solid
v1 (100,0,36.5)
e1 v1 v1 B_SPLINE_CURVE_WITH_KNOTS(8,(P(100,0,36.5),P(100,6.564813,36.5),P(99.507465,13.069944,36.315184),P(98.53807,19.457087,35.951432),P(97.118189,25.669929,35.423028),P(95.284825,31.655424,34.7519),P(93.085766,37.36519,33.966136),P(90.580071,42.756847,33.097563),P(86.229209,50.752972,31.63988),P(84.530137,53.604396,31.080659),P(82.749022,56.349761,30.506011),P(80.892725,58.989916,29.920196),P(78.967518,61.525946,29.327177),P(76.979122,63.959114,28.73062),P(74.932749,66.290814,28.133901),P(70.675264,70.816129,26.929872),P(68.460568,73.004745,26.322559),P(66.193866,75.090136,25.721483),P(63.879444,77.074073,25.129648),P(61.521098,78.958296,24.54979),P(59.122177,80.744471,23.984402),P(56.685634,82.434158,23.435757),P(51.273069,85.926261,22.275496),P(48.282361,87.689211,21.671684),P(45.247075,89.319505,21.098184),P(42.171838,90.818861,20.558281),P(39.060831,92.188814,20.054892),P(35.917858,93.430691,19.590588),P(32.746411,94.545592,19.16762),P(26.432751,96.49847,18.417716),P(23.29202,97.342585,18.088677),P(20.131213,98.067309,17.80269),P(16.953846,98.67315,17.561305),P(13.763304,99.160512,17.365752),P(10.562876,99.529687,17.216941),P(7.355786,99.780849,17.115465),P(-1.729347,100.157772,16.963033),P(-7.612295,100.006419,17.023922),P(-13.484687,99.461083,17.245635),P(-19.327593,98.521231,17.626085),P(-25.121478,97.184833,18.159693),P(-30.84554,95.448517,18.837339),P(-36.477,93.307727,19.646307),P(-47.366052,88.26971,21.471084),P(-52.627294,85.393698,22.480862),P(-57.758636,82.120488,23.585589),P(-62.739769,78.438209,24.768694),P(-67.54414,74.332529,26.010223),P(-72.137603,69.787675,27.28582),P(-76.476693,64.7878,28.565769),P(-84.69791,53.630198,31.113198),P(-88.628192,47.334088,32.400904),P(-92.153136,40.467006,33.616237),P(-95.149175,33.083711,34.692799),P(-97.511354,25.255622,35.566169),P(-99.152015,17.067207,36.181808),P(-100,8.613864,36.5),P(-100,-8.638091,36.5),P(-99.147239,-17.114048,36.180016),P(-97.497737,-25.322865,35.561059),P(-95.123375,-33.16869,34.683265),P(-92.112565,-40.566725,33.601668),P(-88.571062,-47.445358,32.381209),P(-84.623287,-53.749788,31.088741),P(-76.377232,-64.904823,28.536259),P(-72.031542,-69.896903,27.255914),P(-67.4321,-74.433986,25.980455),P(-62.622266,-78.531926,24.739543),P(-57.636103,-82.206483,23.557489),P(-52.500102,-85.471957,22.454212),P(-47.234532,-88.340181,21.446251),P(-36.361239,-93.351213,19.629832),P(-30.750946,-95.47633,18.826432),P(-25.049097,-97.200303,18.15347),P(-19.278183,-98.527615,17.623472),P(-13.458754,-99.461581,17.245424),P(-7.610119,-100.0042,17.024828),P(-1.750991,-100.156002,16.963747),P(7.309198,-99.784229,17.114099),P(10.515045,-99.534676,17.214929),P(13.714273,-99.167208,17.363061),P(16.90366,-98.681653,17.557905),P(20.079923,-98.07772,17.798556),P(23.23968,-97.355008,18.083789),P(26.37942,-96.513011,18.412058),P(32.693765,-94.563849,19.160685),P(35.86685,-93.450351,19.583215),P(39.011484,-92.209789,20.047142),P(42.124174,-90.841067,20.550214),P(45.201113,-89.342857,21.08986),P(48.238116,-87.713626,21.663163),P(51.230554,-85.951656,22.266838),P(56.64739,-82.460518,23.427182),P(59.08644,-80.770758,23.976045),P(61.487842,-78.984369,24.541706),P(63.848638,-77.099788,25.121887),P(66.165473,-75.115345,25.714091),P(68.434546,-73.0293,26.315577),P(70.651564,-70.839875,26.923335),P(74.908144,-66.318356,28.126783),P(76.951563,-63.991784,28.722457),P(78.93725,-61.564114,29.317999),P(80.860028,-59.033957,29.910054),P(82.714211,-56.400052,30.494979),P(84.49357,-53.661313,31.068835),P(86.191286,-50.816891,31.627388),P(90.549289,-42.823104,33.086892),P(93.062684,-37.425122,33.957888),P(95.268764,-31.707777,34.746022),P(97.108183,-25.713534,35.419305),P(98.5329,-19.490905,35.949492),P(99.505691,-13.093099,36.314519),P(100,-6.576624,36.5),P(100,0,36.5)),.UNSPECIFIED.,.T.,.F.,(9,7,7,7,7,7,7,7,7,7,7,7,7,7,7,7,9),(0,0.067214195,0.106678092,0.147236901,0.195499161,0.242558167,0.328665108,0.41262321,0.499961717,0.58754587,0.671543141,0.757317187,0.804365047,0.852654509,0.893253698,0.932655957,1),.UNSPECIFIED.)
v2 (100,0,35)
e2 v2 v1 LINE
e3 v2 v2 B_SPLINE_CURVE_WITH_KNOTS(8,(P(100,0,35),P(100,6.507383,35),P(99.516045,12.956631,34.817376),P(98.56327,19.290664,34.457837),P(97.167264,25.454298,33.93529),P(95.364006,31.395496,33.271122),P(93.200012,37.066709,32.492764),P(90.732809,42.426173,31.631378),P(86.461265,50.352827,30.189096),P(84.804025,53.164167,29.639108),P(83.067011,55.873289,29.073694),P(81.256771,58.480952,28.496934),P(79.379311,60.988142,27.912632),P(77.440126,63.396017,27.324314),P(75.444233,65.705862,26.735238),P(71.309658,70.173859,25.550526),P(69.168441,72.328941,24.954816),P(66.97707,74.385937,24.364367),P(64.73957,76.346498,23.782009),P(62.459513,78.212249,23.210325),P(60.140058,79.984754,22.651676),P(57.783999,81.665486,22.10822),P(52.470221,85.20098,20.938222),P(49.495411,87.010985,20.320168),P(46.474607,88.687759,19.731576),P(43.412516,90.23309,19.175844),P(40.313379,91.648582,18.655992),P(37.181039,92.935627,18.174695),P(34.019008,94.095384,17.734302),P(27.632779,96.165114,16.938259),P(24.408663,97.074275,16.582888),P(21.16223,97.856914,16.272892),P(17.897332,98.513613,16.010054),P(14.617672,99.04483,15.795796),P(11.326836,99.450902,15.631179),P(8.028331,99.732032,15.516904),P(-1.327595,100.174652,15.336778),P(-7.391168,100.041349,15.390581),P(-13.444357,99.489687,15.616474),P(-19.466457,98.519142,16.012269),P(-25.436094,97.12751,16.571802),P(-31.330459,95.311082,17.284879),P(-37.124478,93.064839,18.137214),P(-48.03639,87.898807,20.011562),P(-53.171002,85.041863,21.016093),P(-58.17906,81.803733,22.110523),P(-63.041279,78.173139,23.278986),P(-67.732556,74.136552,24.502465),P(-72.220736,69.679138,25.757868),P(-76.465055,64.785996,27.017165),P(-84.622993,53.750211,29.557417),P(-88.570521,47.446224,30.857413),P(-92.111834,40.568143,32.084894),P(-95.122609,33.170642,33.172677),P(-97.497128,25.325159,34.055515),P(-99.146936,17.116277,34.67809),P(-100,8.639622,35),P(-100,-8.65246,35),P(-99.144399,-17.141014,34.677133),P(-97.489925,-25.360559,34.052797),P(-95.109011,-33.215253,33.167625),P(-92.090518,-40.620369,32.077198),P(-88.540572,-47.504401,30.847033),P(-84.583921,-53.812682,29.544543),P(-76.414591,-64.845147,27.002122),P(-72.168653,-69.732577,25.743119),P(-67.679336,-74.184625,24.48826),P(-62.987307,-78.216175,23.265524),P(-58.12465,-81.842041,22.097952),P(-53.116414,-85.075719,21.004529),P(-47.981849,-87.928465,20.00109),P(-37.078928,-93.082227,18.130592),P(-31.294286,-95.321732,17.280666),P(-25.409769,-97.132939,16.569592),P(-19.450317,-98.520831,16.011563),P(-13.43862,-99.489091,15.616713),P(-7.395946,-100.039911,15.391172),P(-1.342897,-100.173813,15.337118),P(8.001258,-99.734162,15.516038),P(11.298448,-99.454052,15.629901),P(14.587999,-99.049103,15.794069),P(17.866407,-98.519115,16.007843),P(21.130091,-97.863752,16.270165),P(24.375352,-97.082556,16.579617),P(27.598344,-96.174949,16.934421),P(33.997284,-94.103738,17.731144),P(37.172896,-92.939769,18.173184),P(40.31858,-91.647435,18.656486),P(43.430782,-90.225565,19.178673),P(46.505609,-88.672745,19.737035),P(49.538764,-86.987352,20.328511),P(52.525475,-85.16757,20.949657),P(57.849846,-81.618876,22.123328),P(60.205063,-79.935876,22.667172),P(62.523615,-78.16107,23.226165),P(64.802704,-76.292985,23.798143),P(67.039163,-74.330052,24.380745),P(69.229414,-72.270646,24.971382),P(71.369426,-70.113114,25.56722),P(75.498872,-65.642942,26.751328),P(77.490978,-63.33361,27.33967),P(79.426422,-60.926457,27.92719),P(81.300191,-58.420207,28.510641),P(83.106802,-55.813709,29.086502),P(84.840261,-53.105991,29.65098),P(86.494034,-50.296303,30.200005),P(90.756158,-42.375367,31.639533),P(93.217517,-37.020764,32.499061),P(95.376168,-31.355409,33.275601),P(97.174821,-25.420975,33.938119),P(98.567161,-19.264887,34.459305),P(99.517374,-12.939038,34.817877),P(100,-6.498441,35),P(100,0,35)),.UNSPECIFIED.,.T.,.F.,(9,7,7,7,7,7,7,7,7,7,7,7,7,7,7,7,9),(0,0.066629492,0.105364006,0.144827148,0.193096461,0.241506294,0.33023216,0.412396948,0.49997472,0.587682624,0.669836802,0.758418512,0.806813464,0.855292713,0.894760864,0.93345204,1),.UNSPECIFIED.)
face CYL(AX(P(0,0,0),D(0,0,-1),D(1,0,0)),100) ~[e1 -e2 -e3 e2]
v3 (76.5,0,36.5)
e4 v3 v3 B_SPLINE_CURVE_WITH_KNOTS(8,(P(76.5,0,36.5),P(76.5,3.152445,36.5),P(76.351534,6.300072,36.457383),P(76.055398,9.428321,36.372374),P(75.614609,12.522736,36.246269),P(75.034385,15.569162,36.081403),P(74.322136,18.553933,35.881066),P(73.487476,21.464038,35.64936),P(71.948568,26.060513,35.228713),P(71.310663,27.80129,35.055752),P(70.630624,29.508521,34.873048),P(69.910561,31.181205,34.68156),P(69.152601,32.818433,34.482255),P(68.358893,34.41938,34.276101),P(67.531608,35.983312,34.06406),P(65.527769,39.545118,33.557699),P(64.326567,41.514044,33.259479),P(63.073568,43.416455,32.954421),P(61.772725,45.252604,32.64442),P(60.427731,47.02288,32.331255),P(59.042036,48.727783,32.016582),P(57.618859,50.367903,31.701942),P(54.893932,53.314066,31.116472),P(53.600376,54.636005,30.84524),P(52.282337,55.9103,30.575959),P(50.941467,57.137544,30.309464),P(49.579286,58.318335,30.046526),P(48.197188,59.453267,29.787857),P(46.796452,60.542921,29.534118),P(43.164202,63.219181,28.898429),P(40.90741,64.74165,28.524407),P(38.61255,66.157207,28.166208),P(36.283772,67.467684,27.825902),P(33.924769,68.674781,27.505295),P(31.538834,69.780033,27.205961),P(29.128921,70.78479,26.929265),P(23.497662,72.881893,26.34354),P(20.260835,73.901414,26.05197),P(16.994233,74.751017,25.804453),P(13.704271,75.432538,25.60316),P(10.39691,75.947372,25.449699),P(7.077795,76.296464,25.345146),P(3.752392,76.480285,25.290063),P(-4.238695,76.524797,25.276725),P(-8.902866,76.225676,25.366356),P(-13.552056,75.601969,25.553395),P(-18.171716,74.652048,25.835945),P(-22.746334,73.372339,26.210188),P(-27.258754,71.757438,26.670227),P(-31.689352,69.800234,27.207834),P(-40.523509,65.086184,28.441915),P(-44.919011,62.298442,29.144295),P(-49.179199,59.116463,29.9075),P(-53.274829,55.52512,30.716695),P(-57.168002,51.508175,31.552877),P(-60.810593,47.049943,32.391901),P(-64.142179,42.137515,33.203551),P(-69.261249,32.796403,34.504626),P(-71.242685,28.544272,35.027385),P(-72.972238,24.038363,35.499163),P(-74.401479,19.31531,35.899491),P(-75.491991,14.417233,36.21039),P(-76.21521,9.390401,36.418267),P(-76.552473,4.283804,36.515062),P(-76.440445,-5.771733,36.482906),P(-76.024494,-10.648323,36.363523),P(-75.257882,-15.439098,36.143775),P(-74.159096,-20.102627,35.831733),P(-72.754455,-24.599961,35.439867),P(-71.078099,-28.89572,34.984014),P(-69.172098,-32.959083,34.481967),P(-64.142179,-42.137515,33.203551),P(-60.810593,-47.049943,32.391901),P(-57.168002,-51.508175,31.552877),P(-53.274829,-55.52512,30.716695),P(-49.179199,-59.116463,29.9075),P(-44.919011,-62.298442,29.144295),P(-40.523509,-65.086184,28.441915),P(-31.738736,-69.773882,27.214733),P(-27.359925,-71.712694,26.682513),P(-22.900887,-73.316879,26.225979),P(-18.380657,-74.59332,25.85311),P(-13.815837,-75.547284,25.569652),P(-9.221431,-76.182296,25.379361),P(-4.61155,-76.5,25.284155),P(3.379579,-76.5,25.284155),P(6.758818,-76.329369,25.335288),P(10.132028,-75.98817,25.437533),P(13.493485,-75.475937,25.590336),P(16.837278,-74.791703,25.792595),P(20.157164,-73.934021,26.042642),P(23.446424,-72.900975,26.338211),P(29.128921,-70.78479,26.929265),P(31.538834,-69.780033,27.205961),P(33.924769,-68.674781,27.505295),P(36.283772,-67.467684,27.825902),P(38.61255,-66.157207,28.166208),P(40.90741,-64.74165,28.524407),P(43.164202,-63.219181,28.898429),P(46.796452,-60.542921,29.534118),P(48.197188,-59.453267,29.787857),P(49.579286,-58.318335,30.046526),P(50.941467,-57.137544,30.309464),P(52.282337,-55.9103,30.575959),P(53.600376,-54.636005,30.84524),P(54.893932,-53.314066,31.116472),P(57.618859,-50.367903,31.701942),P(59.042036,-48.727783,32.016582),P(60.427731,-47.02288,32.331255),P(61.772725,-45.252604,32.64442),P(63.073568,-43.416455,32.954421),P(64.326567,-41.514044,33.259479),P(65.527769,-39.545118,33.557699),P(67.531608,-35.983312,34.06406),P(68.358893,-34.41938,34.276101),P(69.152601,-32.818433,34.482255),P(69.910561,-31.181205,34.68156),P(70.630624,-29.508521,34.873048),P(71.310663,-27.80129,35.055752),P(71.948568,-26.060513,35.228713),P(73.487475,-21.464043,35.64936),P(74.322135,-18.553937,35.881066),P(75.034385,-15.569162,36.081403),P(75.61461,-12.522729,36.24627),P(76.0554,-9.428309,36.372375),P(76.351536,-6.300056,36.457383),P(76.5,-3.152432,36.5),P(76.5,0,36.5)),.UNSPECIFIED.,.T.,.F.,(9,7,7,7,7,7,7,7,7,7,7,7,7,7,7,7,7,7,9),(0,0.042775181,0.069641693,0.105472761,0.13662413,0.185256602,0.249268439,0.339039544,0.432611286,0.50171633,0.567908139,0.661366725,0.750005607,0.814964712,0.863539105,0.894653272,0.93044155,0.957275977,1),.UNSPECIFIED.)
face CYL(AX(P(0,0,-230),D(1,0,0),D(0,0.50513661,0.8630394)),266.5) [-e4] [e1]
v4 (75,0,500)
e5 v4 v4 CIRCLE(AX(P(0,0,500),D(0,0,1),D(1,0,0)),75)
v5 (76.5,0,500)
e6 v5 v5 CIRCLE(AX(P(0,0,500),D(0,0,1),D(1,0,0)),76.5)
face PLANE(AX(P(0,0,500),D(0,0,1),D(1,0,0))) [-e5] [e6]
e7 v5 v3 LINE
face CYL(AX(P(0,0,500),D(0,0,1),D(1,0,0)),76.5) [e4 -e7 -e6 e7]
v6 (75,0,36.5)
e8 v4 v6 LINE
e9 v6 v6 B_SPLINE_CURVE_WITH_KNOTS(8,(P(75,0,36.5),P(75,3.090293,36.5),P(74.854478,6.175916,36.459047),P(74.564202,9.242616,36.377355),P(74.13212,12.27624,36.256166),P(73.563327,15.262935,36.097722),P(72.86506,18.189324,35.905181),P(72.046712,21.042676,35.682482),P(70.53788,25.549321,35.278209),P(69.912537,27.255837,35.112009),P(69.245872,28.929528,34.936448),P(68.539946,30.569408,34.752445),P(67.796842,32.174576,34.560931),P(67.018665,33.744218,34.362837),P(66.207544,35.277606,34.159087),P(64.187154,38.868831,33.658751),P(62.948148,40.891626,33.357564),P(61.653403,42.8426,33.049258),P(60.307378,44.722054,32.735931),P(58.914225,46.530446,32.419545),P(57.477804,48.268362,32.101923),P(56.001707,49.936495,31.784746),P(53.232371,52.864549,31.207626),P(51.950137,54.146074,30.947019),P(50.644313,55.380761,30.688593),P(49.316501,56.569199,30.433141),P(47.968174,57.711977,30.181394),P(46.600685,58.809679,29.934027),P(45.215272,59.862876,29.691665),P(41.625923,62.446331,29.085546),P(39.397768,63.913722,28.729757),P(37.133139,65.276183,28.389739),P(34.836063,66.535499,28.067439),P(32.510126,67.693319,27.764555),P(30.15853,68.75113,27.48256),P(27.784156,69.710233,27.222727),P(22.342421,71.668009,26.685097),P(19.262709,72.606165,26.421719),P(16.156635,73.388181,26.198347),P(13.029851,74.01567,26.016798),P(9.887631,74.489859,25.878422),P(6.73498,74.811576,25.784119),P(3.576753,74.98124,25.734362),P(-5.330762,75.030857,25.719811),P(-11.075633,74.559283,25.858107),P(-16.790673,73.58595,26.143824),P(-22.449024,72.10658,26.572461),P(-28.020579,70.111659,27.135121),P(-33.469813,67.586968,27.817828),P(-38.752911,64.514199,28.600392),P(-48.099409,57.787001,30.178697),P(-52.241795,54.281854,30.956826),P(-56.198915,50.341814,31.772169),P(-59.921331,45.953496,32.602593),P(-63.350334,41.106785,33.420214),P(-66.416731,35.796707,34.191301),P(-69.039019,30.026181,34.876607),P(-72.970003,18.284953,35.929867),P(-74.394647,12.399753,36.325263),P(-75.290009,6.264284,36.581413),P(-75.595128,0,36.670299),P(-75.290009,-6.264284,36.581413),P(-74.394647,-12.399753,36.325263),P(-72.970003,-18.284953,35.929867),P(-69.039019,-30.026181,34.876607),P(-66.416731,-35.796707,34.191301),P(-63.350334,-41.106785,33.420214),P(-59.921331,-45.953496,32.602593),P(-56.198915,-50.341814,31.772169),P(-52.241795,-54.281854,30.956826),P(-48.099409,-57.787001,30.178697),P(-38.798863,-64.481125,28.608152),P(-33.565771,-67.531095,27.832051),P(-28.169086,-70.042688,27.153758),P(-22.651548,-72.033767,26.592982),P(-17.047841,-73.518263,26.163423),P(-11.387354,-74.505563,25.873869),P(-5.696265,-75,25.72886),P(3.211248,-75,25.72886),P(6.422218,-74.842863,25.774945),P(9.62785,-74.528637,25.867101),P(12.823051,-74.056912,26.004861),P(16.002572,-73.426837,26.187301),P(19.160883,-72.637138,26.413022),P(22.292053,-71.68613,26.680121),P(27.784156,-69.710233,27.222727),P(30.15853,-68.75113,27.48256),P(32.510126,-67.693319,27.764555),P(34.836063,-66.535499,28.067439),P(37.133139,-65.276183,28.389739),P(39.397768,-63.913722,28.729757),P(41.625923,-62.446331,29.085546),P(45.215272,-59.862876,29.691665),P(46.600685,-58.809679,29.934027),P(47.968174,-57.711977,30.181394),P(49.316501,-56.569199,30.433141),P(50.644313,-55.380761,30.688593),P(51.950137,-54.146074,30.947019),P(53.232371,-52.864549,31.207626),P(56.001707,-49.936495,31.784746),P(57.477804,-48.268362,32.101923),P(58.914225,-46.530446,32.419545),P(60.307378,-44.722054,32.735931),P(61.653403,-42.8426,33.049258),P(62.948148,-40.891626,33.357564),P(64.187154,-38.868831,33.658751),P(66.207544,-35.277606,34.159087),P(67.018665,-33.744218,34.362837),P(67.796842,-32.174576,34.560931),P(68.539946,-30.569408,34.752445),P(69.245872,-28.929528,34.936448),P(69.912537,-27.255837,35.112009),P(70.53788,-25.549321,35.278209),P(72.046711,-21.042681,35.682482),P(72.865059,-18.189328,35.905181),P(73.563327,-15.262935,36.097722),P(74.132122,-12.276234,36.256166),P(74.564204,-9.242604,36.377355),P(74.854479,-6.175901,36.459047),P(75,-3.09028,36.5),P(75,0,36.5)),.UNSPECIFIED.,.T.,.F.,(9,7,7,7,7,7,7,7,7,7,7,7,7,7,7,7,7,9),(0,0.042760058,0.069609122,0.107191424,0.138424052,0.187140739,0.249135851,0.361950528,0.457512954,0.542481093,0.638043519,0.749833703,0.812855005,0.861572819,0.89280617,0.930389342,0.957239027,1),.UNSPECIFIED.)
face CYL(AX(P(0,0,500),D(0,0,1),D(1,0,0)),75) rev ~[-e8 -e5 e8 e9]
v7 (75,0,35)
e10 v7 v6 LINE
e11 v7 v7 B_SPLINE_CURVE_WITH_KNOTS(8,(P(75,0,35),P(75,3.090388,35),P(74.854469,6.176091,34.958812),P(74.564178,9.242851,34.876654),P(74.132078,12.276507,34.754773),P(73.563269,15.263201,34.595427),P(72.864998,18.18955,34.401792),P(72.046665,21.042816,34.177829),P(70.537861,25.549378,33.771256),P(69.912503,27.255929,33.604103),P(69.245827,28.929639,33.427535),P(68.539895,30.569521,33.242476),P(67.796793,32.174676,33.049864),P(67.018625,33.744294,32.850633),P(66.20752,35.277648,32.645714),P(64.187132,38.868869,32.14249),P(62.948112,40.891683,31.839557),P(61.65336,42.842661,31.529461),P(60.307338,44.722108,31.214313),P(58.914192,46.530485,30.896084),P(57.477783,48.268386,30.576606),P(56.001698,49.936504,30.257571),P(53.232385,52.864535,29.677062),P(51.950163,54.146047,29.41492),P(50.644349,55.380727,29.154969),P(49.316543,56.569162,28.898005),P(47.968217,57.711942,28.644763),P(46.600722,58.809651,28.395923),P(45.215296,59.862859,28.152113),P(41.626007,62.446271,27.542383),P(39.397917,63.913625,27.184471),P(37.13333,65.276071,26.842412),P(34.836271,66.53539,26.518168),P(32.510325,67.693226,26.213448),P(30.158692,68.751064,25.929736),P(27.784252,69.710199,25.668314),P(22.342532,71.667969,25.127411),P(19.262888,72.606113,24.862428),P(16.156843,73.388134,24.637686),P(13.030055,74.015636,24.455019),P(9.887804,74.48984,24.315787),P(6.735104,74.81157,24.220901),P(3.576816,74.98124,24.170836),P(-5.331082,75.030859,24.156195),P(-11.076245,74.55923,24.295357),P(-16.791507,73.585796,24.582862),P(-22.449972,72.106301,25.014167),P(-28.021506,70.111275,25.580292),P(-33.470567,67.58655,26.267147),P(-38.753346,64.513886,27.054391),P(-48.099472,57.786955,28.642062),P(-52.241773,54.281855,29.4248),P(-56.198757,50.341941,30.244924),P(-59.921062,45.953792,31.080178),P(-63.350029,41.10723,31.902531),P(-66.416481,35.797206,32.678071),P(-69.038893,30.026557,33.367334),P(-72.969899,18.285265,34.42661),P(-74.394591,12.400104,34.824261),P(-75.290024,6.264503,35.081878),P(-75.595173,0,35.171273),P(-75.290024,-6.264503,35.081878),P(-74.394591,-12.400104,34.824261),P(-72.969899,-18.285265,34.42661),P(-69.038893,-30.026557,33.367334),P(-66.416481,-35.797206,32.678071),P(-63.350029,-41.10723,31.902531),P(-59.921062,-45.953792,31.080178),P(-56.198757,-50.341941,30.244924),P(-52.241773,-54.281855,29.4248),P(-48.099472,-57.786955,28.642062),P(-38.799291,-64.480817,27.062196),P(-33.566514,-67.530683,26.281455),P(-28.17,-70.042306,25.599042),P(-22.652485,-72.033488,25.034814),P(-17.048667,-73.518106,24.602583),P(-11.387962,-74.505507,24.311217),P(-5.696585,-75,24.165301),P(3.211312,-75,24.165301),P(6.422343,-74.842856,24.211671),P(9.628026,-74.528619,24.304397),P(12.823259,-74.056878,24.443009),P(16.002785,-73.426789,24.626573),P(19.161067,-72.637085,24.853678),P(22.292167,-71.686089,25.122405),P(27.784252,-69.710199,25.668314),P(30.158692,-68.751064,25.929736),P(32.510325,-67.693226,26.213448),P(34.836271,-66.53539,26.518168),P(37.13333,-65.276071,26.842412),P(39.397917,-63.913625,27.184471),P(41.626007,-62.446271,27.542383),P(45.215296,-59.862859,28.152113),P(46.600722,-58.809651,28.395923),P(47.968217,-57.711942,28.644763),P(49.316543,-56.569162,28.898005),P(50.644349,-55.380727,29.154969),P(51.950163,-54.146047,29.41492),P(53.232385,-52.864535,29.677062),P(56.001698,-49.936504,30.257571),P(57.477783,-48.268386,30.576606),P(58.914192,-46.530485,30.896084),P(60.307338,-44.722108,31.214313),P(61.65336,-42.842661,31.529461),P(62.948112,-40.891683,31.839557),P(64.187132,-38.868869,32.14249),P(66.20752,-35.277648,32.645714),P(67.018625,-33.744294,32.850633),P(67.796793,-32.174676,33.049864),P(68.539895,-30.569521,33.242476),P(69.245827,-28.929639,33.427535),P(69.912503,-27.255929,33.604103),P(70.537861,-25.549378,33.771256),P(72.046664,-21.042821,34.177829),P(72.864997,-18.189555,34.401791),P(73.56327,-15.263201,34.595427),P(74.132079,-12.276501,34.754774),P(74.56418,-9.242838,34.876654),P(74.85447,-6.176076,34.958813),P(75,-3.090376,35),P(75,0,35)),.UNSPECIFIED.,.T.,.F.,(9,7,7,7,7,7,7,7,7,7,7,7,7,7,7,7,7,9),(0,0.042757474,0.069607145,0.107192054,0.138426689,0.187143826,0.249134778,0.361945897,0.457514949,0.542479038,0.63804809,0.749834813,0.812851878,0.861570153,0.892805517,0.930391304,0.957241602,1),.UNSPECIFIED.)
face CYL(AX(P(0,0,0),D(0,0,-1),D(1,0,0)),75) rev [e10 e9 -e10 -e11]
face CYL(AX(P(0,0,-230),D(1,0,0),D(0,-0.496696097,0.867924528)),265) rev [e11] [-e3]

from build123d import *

# Parameters (mm, degrees)
F1_DEPTH      = 125
F1_DEPTH_BACK = 125
F2_R          = 250
F2_R_2        = 100
F2_R_3        = 75
F3_DEPTH      = 36.501
F5_R          = 76.5
F5_R_2        = 75
F6_REACH      = 700.9678513202


with BuildPart() as f1:
    # F0 (on Right) → F1 (new body, two sides)
    with BuildSketch(Plane.YZ) as f1_sk:
        with BuildLine():
            ThreePointArc((-131.6244658109, 0), (0, 35), (131.6244658109, 0))
            Line((131.6244658109, 0), (134.6189065473, 0))
            ThreePointArc((134.6189065473, 0), (0, 36.5), (-134.6189065473, 0))
            Line((-134.6189065473, 0), (-131.6244658109, 0))
        make_face()
    extrude(amount=F1_DEPTH)
    extrude(f1_sk.sketch, amount=-F1_DEPTH_BACK)

    # F2 (on Top) → F3 (cut, through all)
    with BuildSketch(Plane.XY):
        Circle(F2_R)
        Circle(F2_R_2, mode=Mode.SUBTRACT)
        Circle(F2_R_3)
    extrude(amount=F3_DEPTH, mode=Mode.SUBTRACT)

    f6_end = f1.faces().sort_by_distance((-97.1648773409, 0, 36.5))[0]
    # F5 (on offset) → F6 (join, up to a face of the model that its end follows)
    with BuildSketch(Plane.XY.offset(500)):
        Circle(F5_R)
        Circle(F5_R_2, mode=Mode.SUBTRACT)
    f6_long = extrude(amount=-F6_REACH, mode=Mode.PRIVATE)
    add(split(f6_long, bisect_by=f6_end, keep=Keep.TOP, mode=Mode.PRIVATE))


solid = f1.part
